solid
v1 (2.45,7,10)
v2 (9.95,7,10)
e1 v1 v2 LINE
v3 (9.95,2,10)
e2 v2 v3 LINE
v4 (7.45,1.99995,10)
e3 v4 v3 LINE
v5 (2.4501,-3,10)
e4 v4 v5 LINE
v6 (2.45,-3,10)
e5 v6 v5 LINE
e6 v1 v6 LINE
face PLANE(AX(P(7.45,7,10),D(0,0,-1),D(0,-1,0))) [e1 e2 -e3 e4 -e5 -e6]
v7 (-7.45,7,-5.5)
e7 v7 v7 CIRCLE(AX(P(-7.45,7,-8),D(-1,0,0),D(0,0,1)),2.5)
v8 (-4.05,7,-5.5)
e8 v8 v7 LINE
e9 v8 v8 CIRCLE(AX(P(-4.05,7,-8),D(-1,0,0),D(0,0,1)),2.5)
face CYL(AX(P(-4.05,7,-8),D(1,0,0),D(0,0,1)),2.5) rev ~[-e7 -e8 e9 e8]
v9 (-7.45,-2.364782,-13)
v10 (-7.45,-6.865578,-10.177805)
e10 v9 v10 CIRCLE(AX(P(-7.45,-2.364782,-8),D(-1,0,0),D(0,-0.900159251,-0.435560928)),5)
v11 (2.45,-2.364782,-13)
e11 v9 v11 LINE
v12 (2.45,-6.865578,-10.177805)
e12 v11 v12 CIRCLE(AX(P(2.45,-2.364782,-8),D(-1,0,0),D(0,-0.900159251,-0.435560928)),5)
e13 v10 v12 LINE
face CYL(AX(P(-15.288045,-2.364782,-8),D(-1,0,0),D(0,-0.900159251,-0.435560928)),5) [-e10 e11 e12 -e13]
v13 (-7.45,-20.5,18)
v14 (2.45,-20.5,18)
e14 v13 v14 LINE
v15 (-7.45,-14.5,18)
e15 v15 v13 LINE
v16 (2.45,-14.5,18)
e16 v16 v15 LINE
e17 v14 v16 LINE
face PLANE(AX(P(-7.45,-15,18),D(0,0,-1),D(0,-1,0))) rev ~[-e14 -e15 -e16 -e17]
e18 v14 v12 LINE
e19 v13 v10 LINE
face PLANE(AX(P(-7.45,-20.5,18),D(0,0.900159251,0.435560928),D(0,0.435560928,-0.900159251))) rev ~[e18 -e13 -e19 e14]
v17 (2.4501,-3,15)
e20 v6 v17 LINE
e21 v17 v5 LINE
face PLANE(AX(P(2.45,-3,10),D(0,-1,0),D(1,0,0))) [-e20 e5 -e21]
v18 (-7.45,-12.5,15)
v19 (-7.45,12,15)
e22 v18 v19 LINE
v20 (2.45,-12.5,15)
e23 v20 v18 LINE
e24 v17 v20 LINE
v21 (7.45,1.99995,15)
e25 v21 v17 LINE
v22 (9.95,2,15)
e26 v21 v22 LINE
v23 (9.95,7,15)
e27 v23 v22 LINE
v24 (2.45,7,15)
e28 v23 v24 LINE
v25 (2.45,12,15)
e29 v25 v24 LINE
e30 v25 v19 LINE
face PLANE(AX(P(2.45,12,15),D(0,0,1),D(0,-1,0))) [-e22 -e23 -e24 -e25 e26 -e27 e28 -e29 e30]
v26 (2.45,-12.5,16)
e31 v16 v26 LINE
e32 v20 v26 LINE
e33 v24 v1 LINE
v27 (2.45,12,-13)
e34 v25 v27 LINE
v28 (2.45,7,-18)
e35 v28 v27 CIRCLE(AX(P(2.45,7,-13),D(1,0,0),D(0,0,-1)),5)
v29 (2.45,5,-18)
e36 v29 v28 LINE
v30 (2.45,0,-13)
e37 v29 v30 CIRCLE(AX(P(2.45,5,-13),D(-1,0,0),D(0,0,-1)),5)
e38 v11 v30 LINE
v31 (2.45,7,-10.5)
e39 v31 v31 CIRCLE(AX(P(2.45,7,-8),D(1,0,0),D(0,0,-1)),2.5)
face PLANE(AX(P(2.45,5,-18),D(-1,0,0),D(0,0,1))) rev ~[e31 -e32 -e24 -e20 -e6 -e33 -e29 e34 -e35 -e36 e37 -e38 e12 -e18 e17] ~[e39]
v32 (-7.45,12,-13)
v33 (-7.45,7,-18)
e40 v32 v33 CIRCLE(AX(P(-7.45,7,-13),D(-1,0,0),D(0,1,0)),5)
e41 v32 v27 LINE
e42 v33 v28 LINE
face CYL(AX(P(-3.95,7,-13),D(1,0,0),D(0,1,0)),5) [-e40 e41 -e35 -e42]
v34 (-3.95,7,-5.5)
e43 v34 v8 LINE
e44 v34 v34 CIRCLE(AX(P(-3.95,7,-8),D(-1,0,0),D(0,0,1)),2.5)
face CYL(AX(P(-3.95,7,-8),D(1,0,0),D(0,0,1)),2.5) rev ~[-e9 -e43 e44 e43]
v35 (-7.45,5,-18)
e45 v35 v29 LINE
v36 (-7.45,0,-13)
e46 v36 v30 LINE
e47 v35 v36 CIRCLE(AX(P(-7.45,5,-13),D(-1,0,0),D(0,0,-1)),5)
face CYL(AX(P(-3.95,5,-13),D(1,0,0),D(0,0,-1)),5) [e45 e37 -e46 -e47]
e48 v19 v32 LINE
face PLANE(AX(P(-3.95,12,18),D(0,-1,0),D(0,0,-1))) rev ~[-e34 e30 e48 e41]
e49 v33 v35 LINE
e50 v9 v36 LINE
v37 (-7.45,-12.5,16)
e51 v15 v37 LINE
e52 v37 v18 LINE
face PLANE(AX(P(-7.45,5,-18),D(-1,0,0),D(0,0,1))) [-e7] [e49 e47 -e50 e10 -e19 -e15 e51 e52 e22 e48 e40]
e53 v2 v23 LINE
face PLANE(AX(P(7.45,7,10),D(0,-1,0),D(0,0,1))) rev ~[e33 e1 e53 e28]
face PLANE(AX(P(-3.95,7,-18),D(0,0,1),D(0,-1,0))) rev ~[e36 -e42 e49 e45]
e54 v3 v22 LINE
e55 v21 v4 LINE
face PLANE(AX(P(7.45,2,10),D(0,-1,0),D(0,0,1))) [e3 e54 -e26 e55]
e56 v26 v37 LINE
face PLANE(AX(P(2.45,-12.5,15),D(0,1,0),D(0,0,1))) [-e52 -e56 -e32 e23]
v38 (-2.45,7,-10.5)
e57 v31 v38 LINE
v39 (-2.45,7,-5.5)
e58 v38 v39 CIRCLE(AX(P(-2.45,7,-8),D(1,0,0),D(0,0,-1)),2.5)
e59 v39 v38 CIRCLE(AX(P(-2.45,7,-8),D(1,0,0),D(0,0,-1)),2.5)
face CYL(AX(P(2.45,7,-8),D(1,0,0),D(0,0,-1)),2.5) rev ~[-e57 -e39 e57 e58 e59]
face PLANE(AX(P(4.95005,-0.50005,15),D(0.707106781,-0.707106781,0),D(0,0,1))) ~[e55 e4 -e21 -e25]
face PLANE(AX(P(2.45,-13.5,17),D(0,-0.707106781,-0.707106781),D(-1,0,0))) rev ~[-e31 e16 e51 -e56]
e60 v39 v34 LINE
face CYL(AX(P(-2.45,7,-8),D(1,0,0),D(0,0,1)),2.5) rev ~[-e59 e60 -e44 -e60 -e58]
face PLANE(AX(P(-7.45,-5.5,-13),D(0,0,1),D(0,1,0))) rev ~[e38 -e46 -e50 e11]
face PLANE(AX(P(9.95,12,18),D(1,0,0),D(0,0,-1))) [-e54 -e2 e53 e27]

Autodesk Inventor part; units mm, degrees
ref_plane "YZ Plane" through (0, 0, 0) normal (1, 0, 0) x (0, 1, 0)
ref_plane "XZ Plane" through (0, 0, 0) normal (0, 1, 0) x (-1, 0, 0)
ref_plane "XY Plane" through (0, 0, 0) normal (0, 0, 1) x (1, 0, 0)
sketch "Sketch1" plane through (0, 0, 0) normal (0, 1, 0) x (-1, 0, 0)
  line L0 (-2.45, -18) -> (2.45, -18)
  line L1 (2.45, -18) -> (2.45, 18)
  line L2 (2.45, 18) -> (-2.45, 18)
  line L3 (-2.45, 18) -> (-2.45, -18)
  line L4 (-2.45, -18) -> (2.45, 18) construction
  line L5 (2.45, -18) -> (-2.45, 18) construction
  point P0 (0, 0)
  dimension "d0" = 36
  dimension "d1" = 4.9
extrude "Extrusion1" add sketch "Sketch1" along normal blind 12
sketch "Sketch2" plane through (2.45, 0, 18) normal (1, 0, 0) x (0, 0, -1)
  circle A0 centre (26, 7) radius 2.5
  line L0 (36, 0) -> (36, 12) projected
  line L1 (0, 12) -> (36, 12) projected
  point P0 (18, 0)
  dimension "d4" = 5
  dimension "d5" = 10
  dimension "d18" = 5
fillet "Fillet1" radius 5 2 edges at (0, 12, -18) (0, 0, -18)
sketch "Sketch3" plane through (2.45, 0, 18) normal (1, 0, 0) x (0, 0, -1)
  line L0 (0, 0) -> (0, -15)
  arc A0 (36, 7) -> (31, 12) centre (31, 7) ccw projected
  line L1 (0, -15) -> (31, 0)
  line L2 (0, 0) -> (31, 0)
  point P0 (18, 0)
  dimension "d7" = 15
extrude "Extrusion2" cut sketch "Sketch2" against normal blind 10
extrude "Extrusion3" add sketch "Sketch3" against normal blind 5
sketch "Skizze4" plane through (2.45, 12, 18) normal (1, 0, 0) x (0, 0, -1)
  line L0 (8, -10) -> (3, -10)
  line L1 (3, -10) -> (3, -5)
  line L2 (3, -5) -> (8, -5)
  line L3 (8, -5) -> (8, -10)
  line L4 (0, 0) -> (31, 0) projected
  line L5 (0, -27) -> (0, 0) projected
  point P0 (18, -12)
  point P1 (3, -7.5)
  dimension "d12" = 5
  dimension "d13" = 5
  dimension "d14" = 5
  dimension "d15" = 3
extrude "Extrusion4" add sketch "Skizze4" along normal blind 5
sketch "Sketch5" plane through (-2.45, 5, -18) normal (-1, 0, 0) x (0, 0, 1)
  circle A0 centre (10, 2) radius 2.5 projected
  arc A1 (0, 0) -> (5, -5) centre (5, 0) ccw projected
  line L0 (5, -5) -> (36, -5) projected
  line L1 (36, -5) -> (36, 7) projected
  line L2 (5, 7) -> (36, 7) projected
  arc A2 (5, 7) -> (0, 2) centre (5, 2) ccw projected
  line L3 (0, 0) -> (0, 2) projected
  line L4 (5, -5) -> (36, -20) projected
  line L5 (36, -20) -> (36, -5) projected
  line L6 (36, -5) -> (5, -5) projected
  line L7 (5, -5) -> (36, -20) projected
  line L8 (36, -20) -> (36, -5) projected
  line L9 (36, -5) -> (5, -5) projected
  line L10 (5, -5) -> (36, -20) projected
  line L11 (36, -20) -> (36, -5) projected
  line L12 (36, -5) -> (5, -5) projected
  point P0 (18, -5)
extrude "Extrusion5" add sketch "Sketch5" along normal blind 1.5
sketch "Sketch6" plane through (-3.95, 5, -18) normal (-1, 0, 0) x (0, 0, 1)
  line L0 (5, -5) -> (36, -20) projected
  line L1 (36, -20) -> (36, 7) projected
  line L2 (36, 7) -> (5, 7) projected
  arc A0 (5, 7) -> (0, 2) centre (5, 2) ccw projected
  line L3 (0, 2) -> (0, 0) projected
  arc A1 (0, 0) -> (5, -5) centre (5, 0) ccw projected
  circle A2 centre (10, 2) radius 2.5 projected
  point P0 (18, -5)
extrude "Extrusion6" add sketch "Sketch6" along normal blind 0.1
sketch "Sketch7" plane through (2.45, 2, 10) normal (0, -1, 0) x (1, 0, 0)
  line L0 (0, 0) -> (0, 5) projected
  line L1 (0, 0) -> (5, 0) projected
  line L2 (5, 5) -> (5, 0) projected
  line L3 (0, 5) -> (5, 5) projected
  point P0 (-2.45, -10)
extrude "Extrusion7" add sketch "Sketch7" along normal blind 5
chamfer "Chamfer1" distance 5 angle 45 1 edges at (7.45, -3, 12.5)
sketch "Sketch8" plane through (-4.05, 5, -18) normal (-1, 0, 0) x (0, 0, 1)
  line L0 (36, -20) -> (36, 7) projected
  line L1 (36, 7) -> (5, 7) projected
  arc A0 (5, 7) -> (0, 2) centre (5, 2) ccw projected
  line L2 (0, 2) -> (0, 0) projected
  arc A1 (0, 0) -> (5, -5) centre (5, 0) ccw projected
  line L3 (5, -5) -> (36, -20) projected
  circle A2 centre (10, 2) radius 2.5 projected
  point P0 (18, -5)
extrude "Extrusion8" add sketch "Sketch8" along normal blind 3.4
sketch "Sketch9" plane through (7.45, 12, 18) normal (1, 0, 0) x (0, 0, -1)
  line L0 (8, -10) -> (3, -10) construction
  line L1 (8, -5) -> (8, -10) construction
  line L2 (8, -5) -> (3, -5) construction
  line L3 (3, -5) -> (3, -10) construction
  line L4 (8, -10) -> (3, -10) projected
  line L5 (8, -5) -> (8, -10) projected
  line L6 (8, -5) -> (3, -5) projected
  line L7 (3, -5) -> (3, -10) projected
  point P0 (18, -12)
extrude "Extrusion9" add sketch "Sketch9" along normal blind 2.5
sketch "Sketch10" plane through (-7.45, 0, -13) normal (0, -0.9001593, -0.4355609) x (1, 0, 0)
  point P0 (7.45, 11.7021)
sketch "Sketch11" plane through (-7.45, 0, -13) normal (0, -0.9001593, -0.4355609) x (1, 0, 0)
  point P0 (7.45, 11.7021)
sketch "Sketch12" plane through (-7.45, 5, -18) normal (-1, 0, 0) x (0, 0, 1)
  line L0 (36, -20) -> (36, -25.5)
  line L1 (36, -25.5) -> (5, -10.5)
  line L2 (5, -10.5) -> (5, -5)
  arc A0 (0, 0) -> (5, -5) centre (5, 0) ccw projected
  line L3 (5, -5) -> (36, -20)
  point P0 (18, -5)
  dimension "d32" = 5.5
  dimension "d33" = 5.5
extrude "Extrusion10" add sketch "Sketch12" against normal blind 9.9
fillet "Fillet2" radius 5 1 edges at (-2.5, -5.5, -13)
fillet "Fillet3" [suppressed]
sketch "Sketch13" plane through (2.45, 5, -18) normal (1, 0, 0) x (0, 0, -1)
  line L0 (-36, 7) -> (-36, -25.5) projected
  line L1 (-36, 7) -> (-33, 7)
  line L2 (-33, 7) -> (-33, -17.5)
  line L3 (-33, -17.5) -> (-36, -17.5)
  line L4 (-36, -17.5) -> (-36, 7)
  point P0 (-18, -5)
  point P1 (-36, -17.5)
  dimension "d40" = 24.5
extrude "Extrusion11" cut sketch "Sketch13" against normal blind 10
chamfer "Chamfer2" distance 2 angle 45 1 edges at (-5.75, -12.5, 18)
properties part number "HoldingTri"
